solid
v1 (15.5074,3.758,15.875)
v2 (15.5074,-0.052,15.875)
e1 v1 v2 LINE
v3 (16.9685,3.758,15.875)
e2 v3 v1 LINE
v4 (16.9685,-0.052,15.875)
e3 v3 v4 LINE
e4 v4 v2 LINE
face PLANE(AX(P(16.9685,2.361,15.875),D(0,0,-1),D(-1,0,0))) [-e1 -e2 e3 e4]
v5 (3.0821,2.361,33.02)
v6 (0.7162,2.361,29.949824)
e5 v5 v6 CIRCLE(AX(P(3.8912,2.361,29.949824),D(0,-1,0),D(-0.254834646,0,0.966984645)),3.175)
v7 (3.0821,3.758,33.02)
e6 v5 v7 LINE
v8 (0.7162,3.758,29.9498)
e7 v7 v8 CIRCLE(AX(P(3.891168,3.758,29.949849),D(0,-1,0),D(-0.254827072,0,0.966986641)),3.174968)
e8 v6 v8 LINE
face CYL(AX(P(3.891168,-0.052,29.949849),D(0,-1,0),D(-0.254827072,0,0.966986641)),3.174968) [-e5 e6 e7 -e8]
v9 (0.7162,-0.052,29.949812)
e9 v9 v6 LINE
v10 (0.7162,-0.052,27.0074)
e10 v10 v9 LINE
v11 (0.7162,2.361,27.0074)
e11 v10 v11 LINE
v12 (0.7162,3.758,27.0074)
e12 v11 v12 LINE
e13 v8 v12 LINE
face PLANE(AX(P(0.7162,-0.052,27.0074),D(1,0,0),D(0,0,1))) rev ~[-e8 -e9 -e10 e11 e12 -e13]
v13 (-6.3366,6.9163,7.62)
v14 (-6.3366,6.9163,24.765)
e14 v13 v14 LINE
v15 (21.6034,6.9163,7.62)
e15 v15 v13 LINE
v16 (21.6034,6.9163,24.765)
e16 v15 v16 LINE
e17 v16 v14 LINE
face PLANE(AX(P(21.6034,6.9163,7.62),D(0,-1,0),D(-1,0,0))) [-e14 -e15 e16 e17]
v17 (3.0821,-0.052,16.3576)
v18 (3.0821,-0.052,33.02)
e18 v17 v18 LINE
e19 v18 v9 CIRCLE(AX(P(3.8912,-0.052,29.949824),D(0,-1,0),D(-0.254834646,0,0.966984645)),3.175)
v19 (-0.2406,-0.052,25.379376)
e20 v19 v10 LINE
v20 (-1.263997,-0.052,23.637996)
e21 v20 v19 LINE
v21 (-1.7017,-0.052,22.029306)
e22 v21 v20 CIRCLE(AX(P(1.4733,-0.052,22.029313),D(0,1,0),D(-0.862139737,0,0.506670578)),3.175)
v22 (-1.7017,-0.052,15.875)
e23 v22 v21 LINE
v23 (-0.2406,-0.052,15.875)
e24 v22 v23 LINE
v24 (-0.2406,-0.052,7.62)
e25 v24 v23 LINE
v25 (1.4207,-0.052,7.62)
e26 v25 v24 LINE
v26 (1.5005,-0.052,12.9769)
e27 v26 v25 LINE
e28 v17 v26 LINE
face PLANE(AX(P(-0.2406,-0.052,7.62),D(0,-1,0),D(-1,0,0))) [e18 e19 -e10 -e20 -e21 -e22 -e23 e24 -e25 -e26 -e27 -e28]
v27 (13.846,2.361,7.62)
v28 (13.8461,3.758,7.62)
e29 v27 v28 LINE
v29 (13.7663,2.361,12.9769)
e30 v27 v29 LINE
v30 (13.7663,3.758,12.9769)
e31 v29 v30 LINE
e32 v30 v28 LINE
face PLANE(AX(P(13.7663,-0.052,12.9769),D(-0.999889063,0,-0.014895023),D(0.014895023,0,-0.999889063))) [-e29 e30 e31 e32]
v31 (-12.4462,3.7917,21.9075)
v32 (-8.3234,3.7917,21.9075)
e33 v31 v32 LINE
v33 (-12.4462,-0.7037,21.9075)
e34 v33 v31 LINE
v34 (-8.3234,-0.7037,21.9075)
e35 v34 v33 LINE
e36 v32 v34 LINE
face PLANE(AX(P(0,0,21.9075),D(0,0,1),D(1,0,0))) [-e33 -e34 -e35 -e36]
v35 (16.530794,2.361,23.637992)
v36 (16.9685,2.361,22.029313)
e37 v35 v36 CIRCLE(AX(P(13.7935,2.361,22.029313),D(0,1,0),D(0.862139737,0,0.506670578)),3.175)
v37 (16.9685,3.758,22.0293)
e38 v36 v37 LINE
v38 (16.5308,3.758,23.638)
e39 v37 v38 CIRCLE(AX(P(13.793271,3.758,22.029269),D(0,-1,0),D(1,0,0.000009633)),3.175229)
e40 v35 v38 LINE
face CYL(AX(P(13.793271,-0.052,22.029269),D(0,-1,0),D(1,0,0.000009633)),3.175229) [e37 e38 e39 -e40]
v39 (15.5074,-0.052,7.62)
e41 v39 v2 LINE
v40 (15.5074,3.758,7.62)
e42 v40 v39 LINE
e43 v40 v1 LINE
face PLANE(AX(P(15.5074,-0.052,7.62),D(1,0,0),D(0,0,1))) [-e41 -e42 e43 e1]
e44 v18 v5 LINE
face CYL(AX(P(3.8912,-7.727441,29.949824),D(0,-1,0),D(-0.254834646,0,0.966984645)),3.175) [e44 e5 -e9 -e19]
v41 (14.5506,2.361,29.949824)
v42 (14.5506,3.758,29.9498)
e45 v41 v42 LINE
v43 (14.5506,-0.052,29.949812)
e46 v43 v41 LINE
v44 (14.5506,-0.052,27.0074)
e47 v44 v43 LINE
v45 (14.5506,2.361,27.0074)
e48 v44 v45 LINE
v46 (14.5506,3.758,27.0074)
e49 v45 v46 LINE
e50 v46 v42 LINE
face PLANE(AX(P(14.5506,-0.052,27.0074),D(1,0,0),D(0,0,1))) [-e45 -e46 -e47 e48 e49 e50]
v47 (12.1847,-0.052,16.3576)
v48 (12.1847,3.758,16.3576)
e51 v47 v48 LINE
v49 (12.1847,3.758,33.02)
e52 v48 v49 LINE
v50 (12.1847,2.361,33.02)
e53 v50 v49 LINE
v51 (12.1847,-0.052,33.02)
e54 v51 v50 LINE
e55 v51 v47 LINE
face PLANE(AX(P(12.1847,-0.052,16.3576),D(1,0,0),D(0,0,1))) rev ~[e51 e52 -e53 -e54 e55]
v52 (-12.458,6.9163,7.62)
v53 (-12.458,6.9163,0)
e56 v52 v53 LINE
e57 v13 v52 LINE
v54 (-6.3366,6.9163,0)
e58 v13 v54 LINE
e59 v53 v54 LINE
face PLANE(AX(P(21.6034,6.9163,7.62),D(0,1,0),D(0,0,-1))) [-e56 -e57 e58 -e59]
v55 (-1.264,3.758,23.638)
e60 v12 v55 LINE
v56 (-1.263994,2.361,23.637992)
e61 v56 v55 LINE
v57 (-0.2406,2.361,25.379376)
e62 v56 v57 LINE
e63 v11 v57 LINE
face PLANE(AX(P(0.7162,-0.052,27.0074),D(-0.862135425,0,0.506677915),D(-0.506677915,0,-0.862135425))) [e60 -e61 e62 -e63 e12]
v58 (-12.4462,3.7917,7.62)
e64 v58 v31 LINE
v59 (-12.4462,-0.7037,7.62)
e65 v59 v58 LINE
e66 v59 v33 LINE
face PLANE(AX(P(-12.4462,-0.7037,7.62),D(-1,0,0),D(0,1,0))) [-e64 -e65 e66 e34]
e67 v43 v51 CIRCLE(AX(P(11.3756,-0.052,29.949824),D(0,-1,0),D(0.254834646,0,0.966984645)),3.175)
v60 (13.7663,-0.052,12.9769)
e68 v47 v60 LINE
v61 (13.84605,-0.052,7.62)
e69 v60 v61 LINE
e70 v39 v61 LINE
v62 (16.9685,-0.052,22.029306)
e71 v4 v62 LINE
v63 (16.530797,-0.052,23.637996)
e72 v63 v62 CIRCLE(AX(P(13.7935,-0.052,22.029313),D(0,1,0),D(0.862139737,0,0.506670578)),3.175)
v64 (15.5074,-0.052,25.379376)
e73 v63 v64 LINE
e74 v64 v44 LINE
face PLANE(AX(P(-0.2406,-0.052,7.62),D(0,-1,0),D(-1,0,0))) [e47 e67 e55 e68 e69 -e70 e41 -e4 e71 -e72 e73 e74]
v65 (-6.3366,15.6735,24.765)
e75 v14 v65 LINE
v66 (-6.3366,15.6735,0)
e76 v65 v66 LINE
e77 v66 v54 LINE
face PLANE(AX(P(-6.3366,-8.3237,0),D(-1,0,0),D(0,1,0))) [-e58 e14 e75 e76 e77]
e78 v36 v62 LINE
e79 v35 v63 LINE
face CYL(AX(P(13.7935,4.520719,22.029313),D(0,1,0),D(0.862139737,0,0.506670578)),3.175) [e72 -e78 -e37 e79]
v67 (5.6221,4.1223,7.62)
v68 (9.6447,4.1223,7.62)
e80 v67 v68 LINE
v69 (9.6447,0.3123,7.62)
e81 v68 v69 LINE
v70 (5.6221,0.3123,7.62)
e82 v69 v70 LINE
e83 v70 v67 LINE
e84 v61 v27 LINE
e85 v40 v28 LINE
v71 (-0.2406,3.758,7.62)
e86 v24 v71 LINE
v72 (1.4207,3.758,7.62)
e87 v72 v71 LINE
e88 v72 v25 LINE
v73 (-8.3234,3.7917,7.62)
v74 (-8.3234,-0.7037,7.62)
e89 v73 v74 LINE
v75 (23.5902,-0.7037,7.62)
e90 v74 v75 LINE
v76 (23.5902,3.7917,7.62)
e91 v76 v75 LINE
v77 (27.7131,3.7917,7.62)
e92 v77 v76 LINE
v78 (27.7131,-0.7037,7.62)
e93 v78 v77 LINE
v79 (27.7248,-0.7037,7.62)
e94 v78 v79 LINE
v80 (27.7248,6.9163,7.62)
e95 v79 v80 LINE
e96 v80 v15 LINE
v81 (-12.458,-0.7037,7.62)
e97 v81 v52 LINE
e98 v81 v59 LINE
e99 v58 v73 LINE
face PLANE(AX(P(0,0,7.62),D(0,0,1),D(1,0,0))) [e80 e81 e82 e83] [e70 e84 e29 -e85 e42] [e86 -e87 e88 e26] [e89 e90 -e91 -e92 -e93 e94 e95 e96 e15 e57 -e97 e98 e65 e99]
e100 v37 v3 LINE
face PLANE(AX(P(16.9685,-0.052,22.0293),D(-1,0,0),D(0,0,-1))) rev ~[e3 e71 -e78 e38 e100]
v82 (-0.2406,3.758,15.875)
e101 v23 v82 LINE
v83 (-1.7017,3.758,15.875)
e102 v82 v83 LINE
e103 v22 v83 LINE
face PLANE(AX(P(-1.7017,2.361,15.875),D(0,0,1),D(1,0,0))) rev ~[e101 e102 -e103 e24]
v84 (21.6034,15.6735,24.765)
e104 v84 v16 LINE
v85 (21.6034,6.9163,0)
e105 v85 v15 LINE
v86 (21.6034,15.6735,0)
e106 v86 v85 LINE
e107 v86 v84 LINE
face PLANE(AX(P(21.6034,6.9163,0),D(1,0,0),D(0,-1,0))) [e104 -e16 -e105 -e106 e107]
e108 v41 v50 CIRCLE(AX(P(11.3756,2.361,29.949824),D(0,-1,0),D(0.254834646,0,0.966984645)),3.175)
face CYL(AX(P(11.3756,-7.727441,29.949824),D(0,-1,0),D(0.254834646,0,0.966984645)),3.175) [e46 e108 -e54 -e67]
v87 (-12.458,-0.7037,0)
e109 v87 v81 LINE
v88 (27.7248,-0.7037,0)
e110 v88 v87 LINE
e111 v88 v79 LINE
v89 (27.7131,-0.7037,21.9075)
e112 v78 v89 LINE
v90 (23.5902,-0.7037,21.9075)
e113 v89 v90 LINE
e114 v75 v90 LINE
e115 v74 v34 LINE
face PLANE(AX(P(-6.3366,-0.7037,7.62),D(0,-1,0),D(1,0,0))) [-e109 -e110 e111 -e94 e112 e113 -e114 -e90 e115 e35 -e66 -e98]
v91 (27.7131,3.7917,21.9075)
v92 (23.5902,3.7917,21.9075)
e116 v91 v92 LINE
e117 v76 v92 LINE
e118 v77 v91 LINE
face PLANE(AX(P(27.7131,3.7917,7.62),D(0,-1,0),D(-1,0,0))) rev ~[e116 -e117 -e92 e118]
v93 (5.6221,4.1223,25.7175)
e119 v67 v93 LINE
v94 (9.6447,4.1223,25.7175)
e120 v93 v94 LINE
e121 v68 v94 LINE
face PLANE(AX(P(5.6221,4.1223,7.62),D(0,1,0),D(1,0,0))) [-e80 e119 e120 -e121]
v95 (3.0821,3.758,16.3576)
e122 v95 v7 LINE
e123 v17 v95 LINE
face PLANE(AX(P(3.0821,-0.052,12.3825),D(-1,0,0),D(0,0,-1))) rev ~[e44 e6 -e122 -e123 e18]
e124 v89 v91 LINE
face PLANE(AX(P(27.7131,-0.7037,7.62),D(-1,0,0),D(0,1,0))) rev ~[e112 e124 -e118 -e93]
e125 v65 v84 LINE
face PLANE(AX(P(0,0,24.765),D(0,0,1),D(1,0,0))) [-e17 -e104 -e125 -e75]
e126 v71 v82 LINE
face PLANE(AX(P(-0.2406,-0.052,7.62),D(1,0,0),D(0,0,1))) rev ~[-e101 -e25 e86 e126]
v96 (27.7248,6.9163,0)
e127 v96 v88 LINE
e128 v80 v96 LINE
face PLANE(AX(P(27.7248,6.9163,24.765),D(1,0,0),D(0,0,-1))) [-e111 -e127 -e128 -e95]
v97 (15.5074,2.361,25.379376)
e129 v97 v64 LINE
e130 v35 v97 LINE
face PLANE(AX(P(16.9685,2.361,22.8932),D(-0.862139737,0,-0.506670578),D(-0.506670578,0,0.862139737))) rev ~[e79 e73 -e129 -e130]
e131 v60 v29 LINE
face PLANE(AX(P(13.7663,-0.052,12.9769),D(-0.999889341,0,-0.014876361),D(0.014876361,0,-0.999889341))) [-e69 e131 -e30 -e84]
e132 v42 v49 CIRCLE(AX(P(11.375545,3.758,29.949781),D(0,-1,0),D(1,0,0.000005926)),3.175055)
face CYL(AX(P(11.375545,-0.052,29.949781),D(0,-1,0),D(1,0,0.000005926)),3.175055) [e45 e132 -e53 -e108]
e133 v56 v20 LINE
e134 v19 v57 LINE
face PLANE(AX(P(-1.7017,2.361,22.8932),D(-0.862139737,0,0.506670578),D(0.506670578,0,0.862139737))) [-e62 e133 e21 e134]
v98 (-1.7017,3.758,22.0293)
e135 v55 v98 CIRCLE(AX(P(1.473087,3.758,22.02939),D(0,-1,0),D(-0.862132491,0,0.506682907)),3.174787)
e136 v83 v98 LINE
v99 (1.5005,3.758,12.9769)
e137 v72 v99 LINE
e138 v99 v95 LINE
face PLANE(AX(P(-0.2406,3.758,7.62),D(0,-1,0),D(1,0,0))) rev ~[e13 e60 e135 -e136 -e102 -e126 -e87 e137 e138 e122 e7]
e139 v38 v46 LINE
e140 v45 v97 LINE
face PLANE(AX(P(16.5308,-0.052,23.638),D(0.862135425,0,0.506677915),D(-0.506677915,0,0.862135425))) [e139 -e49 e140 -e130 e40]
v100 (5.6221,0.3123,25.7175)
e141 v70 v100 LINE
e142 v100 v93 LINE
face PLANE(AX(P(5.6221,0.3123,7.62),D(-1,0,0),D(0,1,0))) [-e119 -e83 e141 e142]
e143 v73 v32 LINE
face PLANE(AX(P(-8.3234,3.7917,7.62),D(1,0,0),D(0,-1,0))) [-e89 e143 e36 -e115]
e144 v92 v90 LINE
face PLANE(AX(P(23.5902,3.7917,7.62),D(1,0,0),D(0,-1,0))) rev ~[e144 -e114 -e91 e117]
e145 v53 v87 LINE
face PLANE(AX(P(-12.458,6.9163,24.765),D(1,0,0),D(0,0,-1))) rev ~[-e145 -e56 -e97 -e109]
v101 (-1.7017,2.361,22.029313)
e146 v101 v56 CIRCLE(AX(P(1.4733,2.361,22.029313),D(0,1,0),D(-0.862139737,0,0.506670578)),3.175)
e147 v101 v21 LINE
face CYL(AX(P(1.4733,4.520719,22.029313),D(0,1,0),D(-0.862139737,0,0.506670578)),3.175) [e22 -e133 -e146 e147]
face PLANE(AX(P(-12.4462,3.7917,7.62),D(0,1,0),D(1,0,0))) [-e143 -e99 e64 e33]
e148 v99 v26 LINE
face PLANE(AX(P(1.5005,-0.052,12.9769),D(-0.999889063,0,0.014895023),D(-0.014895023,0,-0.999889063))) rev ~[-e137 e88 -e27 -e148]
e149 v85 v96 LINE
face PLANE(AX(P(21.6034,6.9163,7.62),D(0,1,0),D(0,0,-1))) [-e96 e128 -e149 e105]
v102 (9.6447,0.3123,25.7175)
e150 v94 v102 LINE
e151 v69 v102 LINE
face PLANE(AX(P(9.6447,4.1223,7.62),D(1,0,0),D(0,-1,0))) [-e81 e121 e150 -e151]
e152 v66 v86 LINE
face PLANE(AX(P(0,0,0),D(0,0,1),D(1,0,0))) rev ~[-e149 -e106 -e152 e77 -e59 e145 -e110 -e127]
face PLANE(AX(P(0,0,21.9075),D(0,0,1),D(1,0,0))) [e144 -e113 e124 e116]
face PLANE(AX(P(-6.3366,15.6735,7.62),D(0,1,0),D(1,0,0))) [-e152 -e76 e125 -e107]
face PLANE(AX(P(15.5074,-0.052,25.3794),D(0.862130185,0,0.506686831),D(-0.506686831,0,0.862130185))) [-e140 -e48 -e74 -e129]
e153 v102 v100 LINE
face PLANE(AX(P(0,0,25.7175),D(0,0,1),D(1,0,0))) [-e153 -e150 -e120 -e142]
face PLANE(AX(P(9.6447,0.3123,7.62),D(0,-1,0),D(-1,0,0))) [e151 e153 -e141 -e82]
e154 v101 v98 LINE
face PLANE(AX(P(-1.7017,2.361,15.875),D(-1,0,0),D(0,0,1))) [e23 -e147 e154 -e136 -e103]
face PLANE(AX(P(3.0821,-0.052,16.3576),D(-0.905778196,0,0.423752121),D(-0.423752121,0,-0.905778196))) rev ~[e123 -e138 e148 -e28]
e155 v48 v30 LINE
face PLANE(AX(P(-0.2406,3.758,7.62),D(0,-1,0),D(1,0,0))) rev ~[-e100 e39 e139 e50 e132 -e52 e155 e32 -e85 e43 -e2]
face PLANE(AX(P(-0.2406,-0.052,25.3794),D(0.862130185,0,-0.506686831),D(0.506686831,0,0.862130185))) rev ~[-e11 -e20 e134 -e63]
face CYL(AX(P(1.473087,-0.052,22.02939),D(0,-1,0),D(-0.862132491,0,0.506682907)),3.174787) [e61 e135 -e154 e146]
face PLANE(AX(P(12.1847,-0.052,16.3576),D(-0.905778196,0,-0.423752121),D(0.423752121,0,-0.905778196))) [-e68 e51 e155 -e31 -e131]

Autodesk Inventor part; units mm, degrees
ref_plane "YZ Plane" through (0, 0, 0) normal (1, 0, 0) x (0, 1, 0)
ref_plane "XZ Plane" through (0, 0, 0) normal (0, 1, 0) x (-1, 0, 0)
ref_plane "XY Plane" through (0, 0, 0) normal (0, 0, 1) x (1, 0, 0)
sketch "Sketch1" plane through (0, 0, 0) normal (0, 0, 1) x (1, 0, 0)
  line L0 (-6.3366, 6.9163) -> (21.6034, 6.9163)
  line L1 (21.6034, 6.9163) -> (21.6034, -8.3237)
  line L2 (21.6034, -8.3237) -> (-6.3366, -8.3237)
  line L3 (-6.3366, -8.3237) -> (-6.3366, 6.9163)
  point P0 (0, 0)
  dimension "d0" = 27.94
  dimension "d1" = 15.24
extrude "Extrusion1" add sketch "Sketch1" along normal blind 7.62
sketch "Sketch2" plane through (0, 0, 7.62) normal (0, 0, 1) x (1, 0, 0)
  line L0 (-6.3366, 6.9163) -> (-6.3366, -8.3237) projected
  line L1 (21.6034, -8.3237) -> (21.6034, 6.9163) projected
  line L2 (21.6034, -0.052) -> (21.6034, 2.361)
  line L3 (-6.3366, 2.361) -> (-6.3366, -0.052)
  line L4 (21.6034, 6.9163) -> (-6.3366, 6.9163) projected
  line L5 (-6.3366, -8.3237) -> (21.6034, -8.3237) projected
  line L6 (0.9631, 2.361) -> (-0.2406, 2.361)
  line L7 (-0.2406, -0.052) -> (0.9631, -0.052)
  line L8 (-0.2406, -0.052) -> (-0.2406, 2.361)
  line L9 (-0.2406, -0.052) -> (3.0821, -0.052)
  line L10 (3.0821, -0.052) -> (3.0821, 2.361)
  line L11 (3.0821, 2.361) -> (-0.2406, 2.361)
  line L12 (-0.2406, 2.361) -> (-0.2406, -0.052)
  line L13 (14.3038, 2.361) -> (15.5074, 2.361)
  line L14 (15.5074, -0.052) -> (14.3038, -0.052)
  line L15 (15.5074, -0.052) -> (15.5074, 2.361)
  line L16 (15.5074, -0.052) -> (12.1847, -0.052)
  line L17 (12.1847, -0.052) -> (12.1847, 2.361)
  line L18 (12.1847, 2.361) -> (15.5074, 2.361)
  line L19 (15.5074, 2.361) -> (15.5074, -0.052)
  line L20 (-6.3366, -0.7037) -> (21.6034, -0.7037)
  line L21 (-6.3366, 2.361) -> (21.6034, 2.361)
  line L22 (21.6034, 2.361) -> (21.6034, -0.052)
  line L23 (21.6034, -0.052) -> (-6.3366, -0.052)
  line L24 (-6.3366, -0.052) -> (-6.3366, 2.361)
  point P0 (0, 0)
  point P1 (-0.2406, 1.1545)
  point P2 (15.2669, -0.3643)
  point P3 (15.5074, 1.1545)
  point P4 (15.5074, -0.052)
  point P5 (21.6034, -0.052)
  point P6 (15.5074, 2.361)
  point P7 (-6.3366, -0.052)
  point P8 (-0.2406, -0.052)
  point P9 (-0.2406, 2.361)
  point P10 (-6.3366, 2.361)
  point P11 (3.0821, -0.052)
  point P12 (12.1847, -0.052)
  point P13 (12.1847, 2.361)
  point P14 (3.0821, 2.361)
  dimension "d6" = 6.096
extrude "Extrusion2" add sketch "Sketch2" along normal blind 8.7376 contours L6 L11 L10 L9 L7 L8 | L15 L14 L16 L17 L18 L13
sketch "Sketch3" plane through (-0.2406, 2.361, 7.62) normal (0, 1, 0) x (1, 0, 0)
  line L0 (3.3227, -8.7376) -> (0, -8.7376) projected
  line L1 (-6.096, 7.62) -> (21.844, 7.62) projected
  line L2 (3.3227, -11.3552) -> (3.3227, -8.7376)
  line L3 (12.4253, -11.3552) -> (12.4253, -8.7376)
  line L4 (17.2091, -8.255) -> (17.2091, -15.2732)
  line L5 (17.2091, -15.2732) -> (14.9854, -19.057)
  line L6 (14.9854, -19.057) -> (12.4253, -19.057)
  line L7 (12.4253, -19.057) -> (12.4253, -8.7376)
  line L8 (7.874, 7.62) -> (7.874, -24.8322)
  line L9 (3.3227, -11.3552) -> (3.3227, -8.7376)
  line L10 (-1.4611, -8.255) -> (-1.4611, -15.2732)
  line L11 (-1.4611, -15.2732) -> (0.7626, -19.057)
  line L12 (0.7626, -19.057) -> (3.3227, -19.057)
  line L13 (3.3227, -19.057) -> (3.3227, -8.7376)
  line L14 (17.2091, -8.255) -> (12.4253, -8.255)
  line L15 (12.4253, 0) -> (12.4253, -8.7376) projected
  line L16 (12.4253, -8.255) -> (12.4253, -8.7376)
  line L17 (-1.4611, -8.255) -> (3.3227, -8.255)
  line L18 (3.3227, 0) -> (3.3227, -8.7376) projected
  line L19 (3.3227, -8.255) -> (3.3227, -8.7376)
  point P0 (0.2406, 7.62)
extrude "Extrusion4" add sketch "Sketch2" along normal blind 25.4 contours L6 L11 L10 L9 L7 L8 | L15 L14 L16 L17 L18 L13
sketch "Sketch4" plane through (-6.3366, 6.9163, 0) normal (0, 1, 0) x (1, 0, 0)
  point P0 (6.3366, 0)
sketch "Sketch5" plane through (0, 0, 7.62) normal (0, 0, 1) x (1, 0, 0)
  line L0 (21.6034, 6.9163) -> (-6.3366, 6.9163) projected
  line L1 (-6.3366, 15.6735) -> (21.6034, 15.6735)
  line L2 (21.6034, 15.6735) -> (21.6034, 6.9163)
  line L3 (21.6034, 6.9163) -> (-6.3366, 6.9163)
  line L4 (-6.3366, 6.9163) -> (-6.3366, 15.6735)
  point P0 (0, 0)
extrude "Extrusion5" add sketch "Sketch5" along normal blind 17.145 and the other way blind 7.62
extrude "Extrusion6" cut sketch "Sketch2" against normal blind 25.4 contours L20 L1 L5 L0
extrude "Extrusion7" add sketch "Sketch2" along normal blind 4.7625 contours L21 L8 L23 L0 | L1 L23 L15 L21 | L21 L17 L23 L10
extrude "Extrusion8" add sketch "Sketch3" against normal up to surface (2.413 mm away)
sketch "Sketch6" plane through (-6.3366, -0.052, 7.62) normal (0, -1, 0) x (1, 0, 0)
  line L0 (27.94, 0) -> (27.94, 4.7625) projected
  line L1 (21.844, 4.7625) -> (21.844, 8.255) projected
  line L2 (27.94, 0) -> (21.844, 0)
  line L3 (21.844, 0) -> (21.844, 4.7625)
  line L4 (21.844, 4.7625) -> (27.94, 4.7625)
  line L5 (27.94, 4.7625) -> (27.94, 0)
  line L6 (18.5213, 4.7625) -> (18.5213, 25.4) projected
  line L7 (18.5213, 4.7625) -> (9.4187, 4.7625)
  line L8 (9.4187, 4.7625) -> (9.4187, 0)
  line L9 (9.4187, 0) -> (18.5213, 0)
  line L10 (18.5213, 0) -> (18.5213, 4.7625)
  line L11 (6.096, 4.7625) -> (6.096, 8.255) projected
  line L12 (0, 0) -> (0, 4.7625) projected
  line L13 (6.096, 4.7625) -> (0, 4.7625)
  line L14 (0, 4.7625) -> (0, 0)
  line L15 (0, 0) -> (6.096, 0)
  line L16 (6.096, 0) -> (6.096, 4.7625)
  point P0 (6.3366, -7.62)
  point P1 (21.844, 8.7376)
  point P2 (18.5213, 19.057)
  point P3 (6.096, 8.7376)
extrude "Extrusion9" cut sketch "Sketch6" against normal up to surface (6.9683 mm away)
sketch "Sketch7" plane through (12.1847, -0.052, 7.62) normal (0, -1, 0) x (1, 0, 0)
  line L0 (3.3227, 17.7594) -> (4.7838, 15.2732) projected
  line L1 (3.3227, 17.7594) -> (2.3659, 19.3874)
  line L2 (2.3659, 19.3874) -> (2.3659, 25.4)
  line L3 (3.3227, 25.4) -> (0, 25.4) projected
  line L4 (3.3227, 17.7594) -> (3.3227, 25.4) projected
  line L5 (2.3659, 25.4) -> (3.3227, 25.4)
  line L6 (3.3227, 25.4) -> (3.3227, 17.7594)
  line L7 (-18.5213, -7.62) -> (9.4187, -7.62) projected
  line L8 (-12.4253, 17.7594) -> (-11.4685, 19.3874)
  line L9 (-11.4685, 19.3874) -> (-11.4685, 25.4)
  line L10 (-12.4253, 17.7594) -> (-12.4253, 25.4)
  line L11 (-11.4685, 25.4) -> (-12.4253, 25.4)
  line L12 (-12.4253, 25.4) -> (-12.4253, 17.7594)
  line L13 (-12.4253, 8.7376) -> (-13.8865, 8.255) projected
  line L14 (-9.1825, 8.7376) -> (-9.1026, 8.7376)
  line L15 (-9.1026, 0) -> (-9.1026, 25.4) projected
  line L16 (-10.6842, 5.3569) -> (-10.764, 0)
  line L17 (-9.1026, 0) -> (-12.4253, 0) projected
  line L18 (-9.1026, 0) -> (-9.1026, 8.7376)
  line L19 (-10.764, 0) -> (-9.1026, 0)
  line L20 (9.4187, -7.62) -> (-18.5213, -7.62) projected
  line L21 (-18.5213, 17.145) -> (9.4187, 17.145) projected
  line L22 (1.5816, 5.3569) -> (1.6613, 0)
  line L23 (1.6613, 0) -> (0, 0)
  line L24 (0, 0) -> (0, 8.7376)
  line L25 (-4.5513, -7.62) -> (-4.5513, 0)
  line L26 (-4.5513, 11.274) -> (-4.5513, 11.3382)
  line L27 (-9.1026, 8.7376) -> (-10.6842, 5.3569)
  line L28 (0, 8.7376) -> (1.5816, 5.3569)
  point P0 (-12.1847, -7.62)
extrude "Extrusion10" cut sketch "Sketch7" against normal up to surface (6.9683 mm away)
fillet "Fillet1" radius 3.175 4 edges at (0.7162, 1.1545, 33.02) (14.5507, 1.1545, 33.02) (16.9686, 1.1545, 22.8932) (-1.7017, 1.1545, 22.8932)
sketch "Sketch8" plane through (-0.2406, -0.052, 7.62) normal (0, -1, 0) x (1, 0, 0)
  arc A0 (-1.0234, 16.018) -> (-1.4611, 14.4093) centre (1.7139, 14.4093) ccw projected
  line L0 (-1.4611, 8.255) -> (-1.4611, 14.4093) projected
  line L1 (0, 0) -> (0, 8.255) projected
  line L2 (1.6613, 0) -> (0, 0) projected
  line L3 (1.6613, 0) -> (1.7411, 5.3569) projected
  line L4 (1.7411, 5.3569) -> (3.3227, 8.7376) projected
  line L5 (3.3227, 8.7376) -> (3.3227, 25.4) projected
  arc A1 (3.3227, 25.4) -> (0.9568, 22.3298) centre (4.1318, 22.3298) ccw projected
  line L6 (0.9568, 22.3298) -> (0.9568, 19.3874) projected
  line L7 (0.9568, 19.3874) -> (-1.0234, 16.018) projected
  arc A2 (17.2091, 14.4093) -> (16.7714, 16.018) centre (14.0341, 14.4093) ccw projected
  line L8 (16.7714, 16.018) -> (14.7912, 19.3874) projected
  line L9 (14.7912, 19.3874) -> (14.7912, 22.3298) projected
  arc A3 (14.7912, 22.3298) -> (12.4253, 25.4) centre (11.6162, 22.3298) ccw projected
  line L10 (12.4253, 8.7376) -> (12.4253, 25.4) projected
  line L11 (12.4253, 8.7376) -> (14.0069, 5.3569) projected
  line L12 (14.0069, 5.3569) -> (14.0867, 0) projected
  line L13 (15.748, 0) -> (14.0867, 0) projected
  line L14 (15.748, 0) -> (15.748, 8.255) projected
  line L15 (17.2091, 14.4093) -> (17.2091, 8.255) projected
  line L16 (17.2091, 8.255) -> (15.748, 8.255) projected
  line L17 (0, 8.255) -> (-1.4611, 8.255) projected
  point P0 (0.2406, -7.62)
extrude "Extrusion11" add sketch "Sketch8" against normal blind 3.81
sketch "Sketch9" plane through (0, 0, 7.62) normal (0, 0, 1) x (1, 0, 0)
  line L0 (9.6447, 0.3123) -> (5.6221, 0.3123)
  line L1 (5.6221, 0.3123) -> (5.6221, 4.1223)
  line L2 (5.6221, 4.1223) -> (9.6447, 4.1223)
  line L3 (9.6447, 4.1223) -> (9.6447, 0.3123)
  line L4 (12.1847, -0.052) -> (12.1847, 3.758) projected
  line L5 (3.0821, -0.052) -> (3.0821, 3.758) projected
  point P0 (0, 0)
  dimension "d30" = 2.54
  dimension "d31" = 2.54
extrude "Extrusion12" add sketch "Sketch9" along normal blind 18.0975
sketch "Sketch10" plane through (21.6034, 6.9163, 24.765) normal (1, 0, 0) x (0, 0, -1)
  line L0 (17.145, 0) -> (0, 0) projected
  line L1 (24.765, -7.62) -> (17.145, -7.62) projected
  line L2 (17.145, 0) -> (24.765, 0)
  line L3 (24.765, 0) -> (24.765, -7.62)
  line L4 (24.765, -7.62) -> (17.145, -7.62)
  line L5 (17.145, -7.62) -> (17.145, 0)
  point P0 (24.765, -6.9163)
extrude "Extrusion13" add sketch "Sketch10" along normal blind 6.1214 and the other way blind 34.0614
sketch "Sketch11" plane through (0, 0, 7.62) normal (0, 0, 1) x (1, 0, 0)
  line L0 (21.6034, 15.6735) -> (-6.3366, 15.6735) projected
  line L1 (9.6447, 0.3123) -> (5.6221, 0.3123) projected
  line L2 (-12.458, -0.7037) -> (-12.458, 6.9163) projected
  line L3 (-12.458, -0.7037) -> (27.7248, -0.7037) projected
  line L4 (-11.1046, -0.7037) -> (-12.458, -0.7037)
  line L5 (-12.458, -0.7037) -> (-12.458, 4.1961)
  line L6 (21.6034, -0.7037) -> (27.7131, -0.7037)
  line L7 (27.7131, -0.7037) -> (27.7131, 4.8182)
  line L8 (21.6034, 4.8182) -> (21.6034, -0.7037)
  line L9 (-6.3366, -0.7037) -> (-12.4462, -0.7037)
  line L10 (-12.4462, -0.7037) -> (-12.4462, 4.8182)
  line L11 (-6.3366, 4.8182) -> (-6.3366, -0.7037)
  line L12 (21.6034, 6.9163) -> (27.7248, 6.9163) projected
  line L13 (7.6334, 0.3123) -> (7.6334, -0.7037)
  line L14 (-12.4462, 3.7917) -> (-8.3234, 3.7917)
  line L15 (-8.3234, 3.7917) -> (-8.3234, -0.7037)
  line L16 (27.7248, -0.7037) -> (27.7248, 6.9163)
  line L17 (27.7248, -0.7037) -> (-12.458, -0.7037)
  line L18 (26.3715, -0.7037) -> (27.7248, -0.7037)
  line L19 (27.7248, -0.7037) -> (27.7248, 4.1961)
  line L20 (21.6034, -0.7037) -> (27.7131, -0.7037)
  line L21 (27.7131, -0.7037) -> (27.7131, 4.8182)
  line L22 (27.7131, 3.7917) -> (23.5902, 3.7917)
  line L23 (23.5902, 3.7917) -> (23.5902, -0.7037)
  point P0 (0, 0)
  point P1 (22.941, 6.9163)
  point P2 (-7.6742, 6.9163)
  point P3 (-7.6742, 3.7917)
  point P4 (-8.3234, -0.7037)
  point P5 (23.5902, -0.7037)
extrude "Extrusion15" add sketch "Sketch11" along normal blind 14.2875
properties part number "Attachment7"
